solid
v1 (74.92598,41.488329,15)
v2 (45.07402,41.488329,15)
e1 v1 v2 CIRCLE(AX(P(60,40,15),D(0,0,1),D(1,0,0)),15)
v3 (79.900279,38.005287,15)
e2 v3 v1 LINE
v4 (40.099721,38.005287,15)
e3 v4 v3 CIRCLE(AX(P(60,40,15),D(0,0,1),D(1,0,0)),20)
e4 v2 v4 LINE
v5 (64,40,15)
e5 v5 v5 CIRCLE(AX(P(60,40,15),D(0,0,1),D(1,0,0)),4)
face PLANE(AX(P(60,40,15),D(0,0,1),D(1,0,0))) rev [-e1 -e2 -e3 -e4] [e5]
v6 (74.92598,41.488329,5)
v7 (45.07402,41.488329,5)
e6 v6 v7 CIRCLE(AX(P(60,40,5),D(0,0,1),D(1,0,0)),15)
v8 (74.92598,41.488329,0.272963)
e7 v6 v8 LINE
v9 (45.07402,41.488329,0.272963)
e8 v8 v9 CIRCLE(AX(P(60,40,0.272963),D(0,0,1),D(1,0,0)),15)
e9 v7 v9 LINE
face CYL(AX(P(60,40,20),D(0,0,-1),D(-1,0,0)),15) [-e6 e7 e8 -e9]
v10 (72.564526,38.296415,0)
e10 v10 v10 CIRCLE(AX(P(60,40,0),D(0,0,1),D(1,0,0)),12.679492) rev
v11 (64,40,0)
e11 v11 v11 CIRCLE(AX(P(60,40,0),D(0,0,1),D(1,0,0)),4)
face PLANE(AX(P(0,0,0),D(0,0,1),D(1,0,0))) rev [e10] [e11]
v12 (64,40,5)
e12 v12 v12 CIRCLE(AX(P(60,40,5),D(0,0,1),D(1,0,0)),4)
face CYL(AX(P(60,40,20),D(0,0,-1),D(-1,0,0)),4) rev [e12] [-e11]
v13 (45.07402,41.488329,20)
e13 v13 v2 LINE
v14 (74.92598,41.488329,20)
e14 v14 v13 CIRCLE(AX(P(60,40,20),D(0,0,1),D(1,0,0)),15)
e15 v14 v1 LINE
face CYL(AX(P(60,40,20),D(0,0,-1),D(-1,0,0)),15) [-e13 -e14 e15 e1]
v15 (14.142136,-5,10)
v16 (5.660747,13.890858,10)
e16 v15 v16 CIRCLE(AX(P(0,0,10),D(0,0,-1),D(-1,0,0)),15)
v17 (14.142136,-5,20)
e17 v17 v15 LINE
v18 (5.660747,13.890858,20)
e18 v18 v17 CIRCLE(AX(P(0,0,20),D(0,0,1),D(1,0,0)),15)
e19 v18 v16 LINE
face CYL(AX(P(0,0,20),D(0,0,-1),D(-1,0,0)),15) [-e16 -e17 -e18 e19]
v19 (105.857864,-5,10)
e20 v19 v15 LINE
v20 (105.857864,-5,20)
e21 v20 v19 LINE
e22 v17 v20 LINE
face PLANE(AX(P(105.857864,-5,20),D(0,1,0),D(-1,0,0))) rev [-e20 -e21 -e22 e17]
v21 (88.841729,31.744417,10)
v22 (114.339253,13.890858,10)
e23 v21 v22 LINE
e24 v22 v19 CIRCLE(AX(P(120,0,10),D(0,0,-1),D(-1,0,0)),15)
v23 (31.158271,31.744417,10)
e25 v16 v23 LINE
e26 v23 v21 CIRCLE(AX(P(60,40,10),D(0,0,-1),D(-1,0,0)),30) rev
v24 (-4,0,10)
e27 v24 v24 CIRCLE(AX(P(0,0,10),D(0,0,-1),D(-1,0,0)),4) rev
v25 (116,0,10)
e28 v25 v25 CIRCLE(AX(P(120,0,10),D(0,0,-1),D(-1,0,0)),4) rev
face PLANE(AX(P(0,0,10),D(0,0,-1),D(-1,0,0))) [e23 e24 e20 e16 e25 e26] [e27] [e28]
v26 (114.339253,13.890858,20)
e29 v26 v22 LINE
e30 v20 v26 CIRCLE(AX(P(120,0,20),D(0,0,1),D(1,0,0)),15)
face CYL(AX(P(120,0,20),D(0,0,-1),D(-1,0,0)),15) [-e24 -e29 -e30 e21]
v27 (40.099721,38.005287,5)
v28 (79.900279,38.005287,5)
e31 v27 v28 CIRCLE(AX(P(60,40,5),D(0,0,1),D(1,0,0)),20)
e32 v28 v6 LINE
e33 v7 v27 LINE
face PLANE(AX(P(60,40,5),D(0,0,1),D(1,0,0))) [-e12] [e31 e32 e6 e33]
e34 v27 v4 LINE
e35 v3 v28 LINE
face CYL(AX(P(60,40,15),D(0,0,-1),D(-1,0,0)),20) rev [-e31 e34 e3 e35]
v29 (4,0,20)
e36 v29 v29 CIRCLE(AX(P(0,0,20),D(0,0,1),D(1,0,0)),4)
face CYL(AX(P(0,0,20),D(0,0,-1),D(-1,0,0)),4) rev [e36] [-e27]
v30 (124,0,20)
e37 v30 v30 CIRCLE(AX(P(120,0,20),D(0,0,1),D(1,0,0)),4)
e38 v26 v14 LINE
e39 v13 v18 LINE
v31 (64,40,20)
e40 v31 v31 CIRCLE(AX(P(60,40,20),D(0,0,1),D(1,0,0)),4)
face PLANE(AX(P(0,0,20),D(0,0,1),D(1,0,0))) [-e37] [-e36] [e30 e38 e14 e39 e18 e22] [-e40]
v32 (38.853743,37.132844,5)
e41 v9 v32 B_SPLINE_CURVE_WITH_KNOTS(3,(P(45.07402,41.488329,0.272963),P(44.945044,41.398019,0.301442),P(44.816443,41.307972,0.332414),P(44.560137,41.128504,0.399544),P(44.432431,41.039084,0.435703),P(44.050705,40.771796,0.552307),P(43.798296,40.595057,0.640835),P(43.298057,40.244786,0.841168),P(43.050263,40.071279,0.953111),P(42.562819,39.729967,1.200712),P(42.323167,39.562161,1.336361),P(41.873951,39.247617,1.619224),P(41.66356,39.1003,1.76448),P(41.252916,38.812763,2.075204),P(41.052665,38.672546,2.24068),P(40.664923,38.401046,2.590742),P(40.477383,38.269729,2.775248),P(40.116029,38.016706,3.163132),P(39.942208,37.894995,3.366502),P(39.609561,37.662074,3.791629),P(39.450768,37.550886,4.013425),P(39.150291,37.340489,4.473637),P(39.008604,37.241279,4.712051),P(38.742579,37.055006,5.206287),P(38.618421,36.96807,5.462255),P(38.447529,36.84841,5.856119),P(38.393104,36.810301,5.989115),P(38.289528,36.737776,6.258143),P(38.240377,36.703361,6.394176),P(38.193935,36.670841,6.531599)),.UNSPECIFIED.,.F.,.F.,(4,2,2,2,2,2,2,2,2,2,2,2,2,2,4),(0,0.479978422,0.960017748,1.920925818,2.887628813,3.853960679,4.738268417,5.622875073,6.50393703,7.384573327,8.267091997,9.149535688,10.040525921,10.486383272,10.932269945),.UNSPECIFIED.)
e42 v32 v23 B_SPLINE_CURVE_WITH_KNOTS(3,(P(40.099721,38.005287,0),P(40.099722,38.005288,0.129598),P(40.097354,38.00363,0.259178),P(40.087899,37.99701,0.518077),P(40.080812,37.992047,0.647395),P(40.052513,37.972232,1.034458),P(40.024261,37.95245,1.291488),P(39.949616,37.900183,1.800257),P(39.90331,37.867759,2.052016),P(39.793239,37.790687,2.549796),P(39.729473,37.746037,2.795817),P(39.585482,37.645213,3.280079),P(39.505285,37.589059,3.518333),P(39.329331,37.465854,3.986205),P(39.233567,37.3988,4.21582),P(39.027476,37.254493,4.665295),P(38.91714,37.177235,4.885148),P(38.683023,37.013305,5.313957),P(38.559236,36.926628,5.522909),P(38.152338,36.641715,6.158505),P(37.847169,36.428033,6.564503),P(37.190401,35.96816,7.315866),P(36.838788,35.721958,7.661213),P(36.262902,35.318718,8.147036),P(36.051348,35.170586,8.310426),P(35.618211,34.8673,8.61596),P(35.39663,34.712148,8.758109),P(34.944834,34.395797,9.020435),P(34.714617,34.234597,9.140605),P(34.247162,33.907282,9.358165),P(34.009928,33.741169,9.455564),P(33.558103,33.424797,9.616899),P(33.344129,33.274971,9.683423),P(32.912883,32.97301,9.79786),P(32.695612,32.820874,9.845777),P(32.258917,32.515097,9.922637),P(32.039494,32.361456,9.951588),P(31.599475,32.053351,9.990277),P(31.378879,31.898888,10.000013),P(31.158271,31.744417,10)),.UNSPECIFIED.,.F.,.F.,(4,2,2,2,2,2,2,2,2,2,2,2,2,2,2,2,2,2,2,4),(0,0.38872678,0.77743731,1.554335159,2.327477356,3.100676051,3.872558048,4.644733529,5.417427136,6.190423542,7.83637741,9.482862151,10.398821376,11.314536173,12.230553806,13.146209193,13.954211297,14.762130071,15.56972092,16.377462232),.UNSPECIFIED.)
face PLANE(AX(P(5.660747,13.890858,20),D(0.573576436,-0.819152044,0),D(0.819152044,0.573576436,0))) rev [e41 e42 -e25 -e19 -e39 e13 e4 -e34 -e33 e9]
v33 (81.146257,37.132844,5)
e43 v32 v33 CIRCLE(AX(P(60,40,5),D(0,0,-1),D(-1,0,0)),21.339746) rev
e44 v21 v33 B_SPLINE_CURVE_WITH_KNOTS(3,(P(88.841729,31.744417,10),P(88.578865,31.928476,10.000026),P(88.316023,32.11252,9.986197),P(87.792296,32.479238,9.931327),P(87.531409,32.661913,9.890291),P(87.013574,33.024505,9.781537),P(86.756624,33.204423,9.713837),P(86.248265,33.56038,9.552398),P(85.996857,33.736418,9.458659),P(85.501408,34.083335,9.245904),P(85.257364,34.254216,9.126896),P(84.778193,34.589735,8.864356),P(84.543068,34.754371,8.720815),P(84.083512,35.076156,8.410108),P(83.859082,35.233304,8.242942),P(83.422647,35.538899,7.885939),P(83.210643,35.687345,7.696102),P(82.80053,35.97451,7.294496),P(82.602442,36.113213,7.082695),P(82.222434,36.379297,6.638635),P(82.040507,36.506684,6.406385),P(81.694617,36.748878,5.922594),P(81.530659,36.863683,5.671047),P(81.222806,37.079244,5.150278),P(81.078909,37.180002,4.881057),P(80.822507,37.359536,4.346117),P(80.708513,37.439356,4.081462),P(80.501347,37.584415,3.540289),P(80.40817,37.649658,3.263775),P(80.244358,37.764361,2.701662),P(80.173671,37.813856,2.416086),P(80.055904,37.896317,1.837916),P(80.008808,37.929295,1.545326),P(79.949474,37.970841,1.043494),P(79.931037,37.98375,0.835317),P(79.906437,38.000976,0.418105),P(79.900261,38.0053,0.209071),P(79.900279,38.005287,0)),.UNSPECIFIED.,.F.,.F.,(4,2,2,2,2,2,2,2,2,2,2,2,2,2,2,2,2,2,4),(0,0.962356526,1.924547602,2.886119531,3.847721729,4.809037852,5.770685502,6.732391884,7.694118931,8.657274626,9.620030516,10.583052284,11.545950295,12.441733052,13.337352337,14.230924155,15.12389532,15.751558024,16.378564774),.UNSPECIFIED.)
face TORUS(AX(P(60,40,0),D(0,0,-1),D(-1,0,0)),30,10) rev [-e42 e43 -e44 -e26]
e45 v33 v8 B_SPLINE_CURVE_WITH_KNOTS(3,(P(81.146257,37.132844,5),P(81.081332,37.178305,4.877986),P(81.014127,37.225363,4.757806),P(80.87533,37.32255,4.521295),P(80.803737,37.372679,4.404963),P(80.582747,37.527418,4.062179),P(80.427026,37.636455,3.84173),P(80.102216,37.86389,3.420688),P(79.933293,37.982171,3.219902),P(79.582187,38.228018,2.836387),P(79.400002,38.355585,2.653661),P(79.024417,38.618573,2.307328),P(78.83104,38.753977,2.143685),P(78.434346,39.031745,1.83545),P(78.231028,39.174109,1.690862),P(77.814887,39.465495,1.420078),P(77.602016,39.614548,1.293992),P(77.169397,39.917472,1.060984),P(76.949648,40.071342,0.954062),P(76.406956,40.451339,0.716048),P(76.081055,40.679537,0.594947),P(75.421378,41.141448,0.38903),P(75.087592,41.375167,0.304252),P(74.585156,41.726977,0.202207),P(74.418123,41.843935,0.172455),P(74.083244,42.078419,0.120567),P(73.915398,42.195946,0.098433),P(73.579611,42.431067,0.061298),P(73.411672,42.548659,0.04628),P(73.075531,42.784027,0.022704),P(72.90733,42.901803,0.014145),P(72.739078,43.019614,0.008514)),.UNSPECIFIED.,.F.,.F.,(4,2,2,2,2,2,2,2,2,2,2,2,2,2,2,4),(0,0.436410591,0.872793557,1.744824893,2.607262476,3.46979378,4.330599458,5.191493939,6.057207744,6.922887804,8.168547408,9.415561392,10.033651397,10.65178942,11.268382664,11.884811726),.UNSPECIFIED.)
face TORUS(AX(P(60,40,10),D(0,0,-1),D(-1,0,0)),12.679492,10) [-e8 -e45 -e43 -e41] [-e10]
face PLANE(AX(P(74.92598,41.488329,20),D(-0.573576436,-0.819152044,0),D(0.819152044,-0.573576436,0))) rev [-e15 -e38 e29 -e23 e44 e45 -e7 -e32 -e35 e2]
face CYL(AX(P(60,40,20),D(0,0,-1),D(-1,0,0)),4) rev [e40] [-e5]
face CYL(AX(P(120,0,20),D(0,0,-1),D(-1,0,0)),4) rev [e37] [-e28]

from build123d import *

# Parameters (mm, degrees)
SKETCH1_R               = 4
BOSS_EXTRUDE1_DEPTH     = 20
SKETCH2_R               = 4
CUT_EXTRUDE1_DEPTH      = 10
FILLET2_R               = 10
CUT_EXTRUDE2_DEPTH      = 5
CUT_EXTRUDE2_DEPTH_BACK = 5
SKETCH5_R               = 20


with BuildPart() as part:
    # Sketch1 → Boss-Extrude1 (new body)
    with BuildSketch(Plane.XY):
        with BuildLine():
            Line((5.660747058, 13.890858244), (45.074020085, 41.488329122))
            ThreePointArc((45.074020085, 41.488329122), (60, 55), (74.925979915, 41.488329122))
            Line((74.925979915, 41.488329122), (114.339252942, 13.890858244))
            ThreePointArc((114.339252942, 13.890858244), (133.684102891, -6.143722656), (105.857864376, -5))
            Line((105.857864376, -5), (14.142135624, -5))
            ThreePointArc((14.142135624, -5), (-13.684102891, -6.143722656), (5.660747058, 13.890858244))
        make_face()
        with Locations((60, 40)):
            Circle(SKETCH1_R, mode=Mode.SUBTRACT)
        with Locations((120, 0)):
            Circle(SKETCH1_R, mode=Mode.SUBTRACT)
        Circle(SKETCH1_R, mode=Mode.SUBTRACT)
    extrude(amount=BOSS_EXTRUDE1_DEPTH)

    # Sketch2 → Cut-Extrude1 (cut)
    with BuildSketch(Plane(origin=(0, 0, 0), x_dir=(-1, 0, 0), z_dir=(0, 0, -1))):
        with BuildLine():
            ThreePointArc((-40.099720592, 38.00528712), (-60, 20), (-79.900279408, 38.00528712))
            Line((-79.900279408, 38.00528712), (-114.339252942, 13.890858244))
            ThreePointArc((-114.339252942, 13.890858244), (-133.684102891, -6.143722656), (-105.857864376, -5))
            Line((-105.857864376, -5), (-14.142135624, -5))
            ThreePointArc((-14.142135624, -5), (13.684102891, -6.143722656), (-5.660747058, 13.890858244))
            Line((-5.660747058, 13.890858244), (-40.099720592, 38.00528712))
        make_face()
        with Locations((-120, 0)):
            Circle(SKETCH2_R, mode=Mode.SUBTRACT)
        Circle(SKETCH2_R, mode=Mode.SUBTRACT)
    extrude(amount=-CUT_EXTRUDE1_DEPTH, mode=Mode.SUBTRACT)

    # Fillet2
    fillet2_edges = [part.edges().sort_by_distance(p)[0] for p in [
        (60, 20, 10),
    ]]
    fillet(fillet2_edges, radius=FILLET2_R - 0.0001)  # a hair under: the kernel refuses the full size

    # Fillet3: read off the stored shape, not the designer's step
    # Fillet3 outline → Fillet3 (revolve, cut)
    with BuildSketch(Plane(origin=(60, 40, 0), x_dir=(1, 0, 0), z_dir=(0, -1, 0))):
        with BuildLine():
            Line((21.33974599, 0), (21.33974599, 5.000000048))
            ThreePointArc((21.33974599, 5.000000048), (17.679491948, 1.339745976), (12.679491924, 0))
            Line((12.679491924, 0), (21.33974599, 0))
        make_face()
    revolve(axis=Axis((60, 40, 0), (0, 0, 1)), mode=Mode.SUBTRACT)

    # Sketch5 → Cut-Extrude2 (cut, two sides: drawn at the far end of the back side and taken through both)
    with BuildSketch(Plane.XY.offset(10).offset(-CUT_EXTRUDE2_DEPTH_BACK)):
        with Locations((60, 40)):
            Circle(SKETCH5_R)
    extrude(amount=CUT_EXTRUDE2_DEPTH + CUT_EXTRUDE2_DEPTH_BACK, mode=Mode.SUBTRACT)


solid = part.part
